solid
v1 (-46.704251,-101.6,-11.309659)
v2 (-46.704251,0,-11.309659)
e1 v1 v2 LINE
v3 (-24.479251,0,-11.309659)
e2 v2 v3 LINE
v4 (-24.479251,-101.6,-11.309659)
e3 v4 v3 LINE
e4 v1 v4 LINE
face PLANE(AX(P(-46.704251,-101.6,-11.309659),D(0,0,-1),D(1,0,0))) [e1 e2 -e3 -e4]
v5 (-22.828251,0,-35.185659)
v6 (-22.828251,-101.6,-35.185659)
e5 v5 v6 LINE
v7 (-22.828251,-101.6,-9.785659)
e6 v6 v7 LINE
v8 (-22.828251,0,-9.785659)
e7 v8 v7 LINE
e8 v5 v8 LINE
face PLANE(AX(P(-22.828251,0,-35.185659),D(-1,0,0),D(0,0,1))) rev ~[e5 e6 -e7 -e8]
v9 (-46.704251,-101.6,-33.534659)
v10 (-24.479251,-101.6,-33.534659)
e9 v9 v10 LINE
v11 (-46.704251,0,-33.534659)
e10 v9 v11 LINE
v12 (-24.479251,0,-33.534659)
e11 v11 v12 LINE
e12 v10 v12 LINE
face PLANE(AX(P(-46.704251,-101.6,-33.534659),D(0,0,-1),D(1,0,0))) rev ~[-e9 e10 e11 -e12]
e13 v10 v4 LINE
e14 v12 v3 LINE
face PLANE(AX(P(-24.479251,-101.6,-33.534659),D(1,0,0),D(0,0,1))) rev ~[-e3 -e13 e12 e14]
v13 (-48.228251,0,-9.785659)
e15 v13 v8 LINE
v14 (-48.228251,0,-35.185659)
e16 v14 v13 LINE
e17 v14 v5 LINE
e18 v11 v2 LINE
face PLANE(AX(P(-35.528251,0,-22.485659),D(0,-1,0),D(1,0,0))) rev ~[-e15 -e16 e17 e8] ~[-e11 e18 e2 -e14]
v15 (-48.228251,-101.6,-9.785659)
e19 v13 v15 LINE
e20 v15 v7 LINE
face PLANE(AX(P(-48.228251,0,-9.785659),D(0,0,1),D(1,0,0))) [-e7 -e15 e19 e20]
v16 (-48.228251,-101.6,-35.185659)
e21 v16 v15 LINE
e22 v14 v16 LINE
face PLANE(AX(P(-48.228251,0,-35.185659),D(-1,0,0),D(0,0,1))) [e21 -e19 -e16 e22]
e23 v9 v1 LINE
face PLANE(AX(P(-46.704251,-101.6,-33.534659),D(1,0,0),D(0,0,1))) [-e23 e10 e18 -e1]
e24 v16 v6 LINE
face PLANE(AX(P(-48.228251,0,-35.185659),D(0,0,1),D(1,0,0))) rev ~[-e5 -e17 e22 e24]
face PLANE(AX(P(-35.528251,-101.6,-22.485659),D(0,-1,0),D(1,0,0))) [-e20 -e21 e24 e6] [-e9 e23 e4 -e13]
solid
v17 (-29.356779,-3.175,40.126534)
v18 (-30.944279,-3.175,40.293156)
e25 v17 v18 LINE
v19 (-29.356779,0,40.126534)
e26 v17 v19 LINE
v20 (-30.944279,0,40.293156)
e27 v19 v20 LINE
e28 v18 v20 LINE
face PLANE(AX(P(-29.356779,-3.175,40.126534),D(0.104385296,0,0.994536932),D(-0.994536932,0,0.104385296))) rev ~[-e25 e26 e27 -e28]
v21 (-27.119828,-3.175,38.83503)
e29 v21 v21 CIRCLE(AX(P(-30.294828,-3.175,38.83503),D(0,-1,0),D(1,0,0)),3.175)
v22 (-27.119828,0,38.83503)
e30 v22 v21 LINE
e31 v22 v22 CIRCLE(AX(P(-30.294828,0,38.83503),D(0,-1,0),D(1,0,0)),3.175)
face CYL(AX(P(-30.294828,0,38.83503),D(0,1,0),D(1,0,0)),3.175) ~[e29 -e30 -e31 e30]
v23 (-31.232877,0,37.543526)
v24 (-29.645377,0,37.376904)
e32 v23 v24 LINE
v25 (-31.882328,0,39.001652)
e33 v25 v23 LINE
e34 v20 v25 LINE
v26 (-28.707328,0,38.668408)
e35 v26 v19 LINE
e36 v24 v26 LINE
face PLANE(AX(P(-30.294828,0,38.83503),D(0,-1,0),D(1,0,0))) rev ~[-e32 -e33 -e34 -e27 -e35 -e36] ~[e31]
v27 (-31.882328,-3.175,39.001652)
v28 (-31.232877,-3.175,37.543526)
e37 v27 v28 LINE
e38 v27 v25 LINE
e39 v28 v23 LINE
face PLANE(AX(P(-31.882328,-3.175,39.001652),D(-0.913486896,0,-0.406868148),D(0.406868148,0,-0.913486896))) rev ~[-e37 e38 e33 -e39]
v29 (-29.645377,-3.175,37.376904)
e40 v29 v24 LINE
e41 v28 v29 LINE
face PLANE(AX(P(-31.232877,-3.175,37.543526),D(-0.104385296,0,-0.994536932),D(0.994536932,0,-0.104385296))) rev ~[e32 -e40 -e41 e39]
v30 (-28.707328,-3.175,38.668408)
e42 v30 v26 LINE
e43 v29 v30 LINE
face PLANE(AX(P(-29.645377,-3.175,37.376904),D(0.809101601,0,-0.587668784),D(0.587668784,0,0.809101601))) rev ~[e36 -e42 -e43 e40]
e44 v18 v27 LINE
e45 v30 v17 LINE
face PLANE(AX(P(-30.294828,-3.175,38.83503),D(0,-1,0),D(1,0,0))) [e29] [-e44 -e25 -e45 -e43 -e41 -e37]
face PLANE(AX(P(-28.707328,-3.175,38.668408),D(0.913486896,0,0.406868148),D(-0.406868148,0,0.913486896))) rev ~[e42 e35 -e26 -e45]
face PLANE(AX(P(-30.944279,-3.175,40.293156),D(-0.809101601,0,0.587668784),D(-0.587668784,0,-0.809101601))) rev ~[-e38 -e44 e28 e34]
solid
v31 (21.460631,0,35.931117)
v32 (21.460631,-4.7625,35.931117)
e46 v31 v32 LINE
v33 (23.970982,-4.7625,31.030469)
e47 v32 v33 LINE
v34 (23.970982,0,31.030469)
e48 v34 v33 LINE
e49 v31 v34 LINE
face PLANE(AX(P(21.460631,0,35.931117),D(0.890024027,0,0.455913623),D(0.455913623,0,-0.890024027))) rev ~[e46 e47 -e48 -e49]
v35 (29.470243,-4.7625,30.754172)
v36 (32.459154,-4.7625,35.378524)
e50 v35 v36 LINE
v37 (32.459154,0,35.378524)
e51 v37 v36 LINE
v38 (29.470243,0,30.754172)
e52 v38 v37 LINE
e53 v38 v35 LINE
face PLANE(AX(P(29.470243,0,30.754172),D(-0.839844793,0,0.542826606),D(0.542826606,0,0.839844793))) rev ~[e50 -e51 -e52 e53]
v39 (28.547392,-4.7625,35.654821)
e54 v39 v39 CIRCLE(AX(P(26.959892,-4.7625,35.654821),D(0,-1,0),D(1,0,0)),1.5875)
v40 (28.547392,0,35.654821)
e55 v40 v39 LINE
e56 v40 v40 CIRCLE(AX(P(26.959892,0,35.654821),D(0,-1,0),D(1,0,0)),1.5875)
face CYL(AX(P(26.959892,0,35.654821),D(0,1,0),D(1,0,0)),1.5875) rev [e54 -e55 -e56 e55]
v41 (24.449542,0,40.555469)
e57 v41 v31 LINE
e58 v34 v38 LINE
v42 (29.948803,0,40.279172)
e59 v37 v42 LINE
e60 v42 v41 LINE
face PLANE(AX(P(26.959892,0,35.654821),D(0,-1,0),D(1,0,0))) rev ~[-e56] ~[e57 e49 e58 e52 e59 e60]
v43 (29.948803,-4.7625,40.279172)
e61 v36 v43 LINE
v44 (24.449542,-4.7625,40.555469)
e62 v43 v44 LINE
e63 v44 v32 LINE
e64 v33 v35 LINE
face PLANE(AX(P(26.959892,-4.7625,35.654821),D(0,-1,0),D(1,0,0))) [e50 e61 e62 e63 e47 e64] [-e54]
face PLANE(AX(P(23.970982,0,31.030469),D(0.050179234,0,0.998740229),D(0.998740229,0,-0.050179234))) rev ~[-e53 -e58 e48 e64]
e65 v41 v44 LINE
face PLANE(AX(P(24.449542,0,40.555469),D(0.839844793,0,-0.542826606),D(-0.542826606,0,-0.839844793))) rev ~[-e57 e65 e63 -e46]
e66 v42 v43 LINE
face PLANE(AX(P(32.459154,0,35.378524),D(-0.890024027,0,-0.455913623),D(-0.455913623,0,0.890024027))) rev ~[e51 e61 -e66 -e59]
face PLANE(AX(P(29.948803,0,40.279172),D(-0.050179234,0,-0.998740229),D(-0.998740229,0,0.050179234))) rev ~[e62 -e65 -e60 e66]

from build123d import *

# Parameters (mm, degrees)
F0_R      = 3.175
F1_DEPTH  = 3.175
F3_DEPTH  = 3.175
F6_R      = 1.5875
F7_DEPTH  = 4.7625
F8_W      = 25.4
F8_H      = 25.4
F9_DEPTH  = 101.6
F10_W     = 22.225
F10_H     = 22.225
F12_DEPTH = 101.6


# Not quite as in the source:
# - the program builds the solid bodies; features that only make, move or delete a surface that nothing else refers to are left out


with BuildPart() as f1:
    # F0 (on Front) → F1 (new body)
    with BuildSketch(Plane.XZ):
        with Locations((-30.2948281169, 38.8350300491)):
            Circle(F0_R)
    extrude(amount=F1_DEPTH)

    # F2 (on face) → F3 (cut)
    with BuildSketch(Plane.XZ.offset(3.175)):
        Polygon((-30.9442792982, 40.2931563394), (-31.8823281169, 39.0016519727), (-31.2328769355, 37.5435256824), (-29.6453769355, 37.3769037588), (-28.7073281169, 38.6684081255), (-29.3567792982, 40.1265344158), align=None)
    extrude(amount=-F3_DEPTH, mode=Mode.SUBTRACT)


with BuildPart() as f7:
    # F6 (on Front) → F7 (new body)
    with BuildSketch(Plane.XZ):
        Polygon((29.470242978, 30.7541721055), (32.4591536764, 35.3785237092), (29.9488030608, 40.2791721055), (24.4495417467, 40.5554688981), (21.4606310483, 35.9311172944), (23.9709816639, 31.0304688981), align=None)
        with Locations((26.9598923624, 35.6548205018)):
            Circle(F6_R, mode=Mode.SUBTRACT)
    extrude(amount=F7_DEPTH)


with BuildPart() as f9:
    # F8 (on Front) → F9 (new body)
    with BuildSketch(Plane.XZ):
        with Locations((-34.0042514727, -24.0096593054)):
            Rectangle(F8_W, F8_H)
    extrude(amount=F9_DEPTH)


with BuildPart() as f9_1:
    # F11: moved
    add(f9.part.moved(Location((-1.524, 0, 1.524))))

    # F10 (on face) → F12 (cut)
    with BuildSketch(Plane.XZ.offset(101.6)):
        with Locations((-35.5917514727, -22.4221593054)):
            Rectangle(F10_W, F10_H)
    extrude(amount=-F12_DEPTH, mode=Mode.SUBTRACT)


solid = Compound([f1.part, f7.part, f9_1.part])
